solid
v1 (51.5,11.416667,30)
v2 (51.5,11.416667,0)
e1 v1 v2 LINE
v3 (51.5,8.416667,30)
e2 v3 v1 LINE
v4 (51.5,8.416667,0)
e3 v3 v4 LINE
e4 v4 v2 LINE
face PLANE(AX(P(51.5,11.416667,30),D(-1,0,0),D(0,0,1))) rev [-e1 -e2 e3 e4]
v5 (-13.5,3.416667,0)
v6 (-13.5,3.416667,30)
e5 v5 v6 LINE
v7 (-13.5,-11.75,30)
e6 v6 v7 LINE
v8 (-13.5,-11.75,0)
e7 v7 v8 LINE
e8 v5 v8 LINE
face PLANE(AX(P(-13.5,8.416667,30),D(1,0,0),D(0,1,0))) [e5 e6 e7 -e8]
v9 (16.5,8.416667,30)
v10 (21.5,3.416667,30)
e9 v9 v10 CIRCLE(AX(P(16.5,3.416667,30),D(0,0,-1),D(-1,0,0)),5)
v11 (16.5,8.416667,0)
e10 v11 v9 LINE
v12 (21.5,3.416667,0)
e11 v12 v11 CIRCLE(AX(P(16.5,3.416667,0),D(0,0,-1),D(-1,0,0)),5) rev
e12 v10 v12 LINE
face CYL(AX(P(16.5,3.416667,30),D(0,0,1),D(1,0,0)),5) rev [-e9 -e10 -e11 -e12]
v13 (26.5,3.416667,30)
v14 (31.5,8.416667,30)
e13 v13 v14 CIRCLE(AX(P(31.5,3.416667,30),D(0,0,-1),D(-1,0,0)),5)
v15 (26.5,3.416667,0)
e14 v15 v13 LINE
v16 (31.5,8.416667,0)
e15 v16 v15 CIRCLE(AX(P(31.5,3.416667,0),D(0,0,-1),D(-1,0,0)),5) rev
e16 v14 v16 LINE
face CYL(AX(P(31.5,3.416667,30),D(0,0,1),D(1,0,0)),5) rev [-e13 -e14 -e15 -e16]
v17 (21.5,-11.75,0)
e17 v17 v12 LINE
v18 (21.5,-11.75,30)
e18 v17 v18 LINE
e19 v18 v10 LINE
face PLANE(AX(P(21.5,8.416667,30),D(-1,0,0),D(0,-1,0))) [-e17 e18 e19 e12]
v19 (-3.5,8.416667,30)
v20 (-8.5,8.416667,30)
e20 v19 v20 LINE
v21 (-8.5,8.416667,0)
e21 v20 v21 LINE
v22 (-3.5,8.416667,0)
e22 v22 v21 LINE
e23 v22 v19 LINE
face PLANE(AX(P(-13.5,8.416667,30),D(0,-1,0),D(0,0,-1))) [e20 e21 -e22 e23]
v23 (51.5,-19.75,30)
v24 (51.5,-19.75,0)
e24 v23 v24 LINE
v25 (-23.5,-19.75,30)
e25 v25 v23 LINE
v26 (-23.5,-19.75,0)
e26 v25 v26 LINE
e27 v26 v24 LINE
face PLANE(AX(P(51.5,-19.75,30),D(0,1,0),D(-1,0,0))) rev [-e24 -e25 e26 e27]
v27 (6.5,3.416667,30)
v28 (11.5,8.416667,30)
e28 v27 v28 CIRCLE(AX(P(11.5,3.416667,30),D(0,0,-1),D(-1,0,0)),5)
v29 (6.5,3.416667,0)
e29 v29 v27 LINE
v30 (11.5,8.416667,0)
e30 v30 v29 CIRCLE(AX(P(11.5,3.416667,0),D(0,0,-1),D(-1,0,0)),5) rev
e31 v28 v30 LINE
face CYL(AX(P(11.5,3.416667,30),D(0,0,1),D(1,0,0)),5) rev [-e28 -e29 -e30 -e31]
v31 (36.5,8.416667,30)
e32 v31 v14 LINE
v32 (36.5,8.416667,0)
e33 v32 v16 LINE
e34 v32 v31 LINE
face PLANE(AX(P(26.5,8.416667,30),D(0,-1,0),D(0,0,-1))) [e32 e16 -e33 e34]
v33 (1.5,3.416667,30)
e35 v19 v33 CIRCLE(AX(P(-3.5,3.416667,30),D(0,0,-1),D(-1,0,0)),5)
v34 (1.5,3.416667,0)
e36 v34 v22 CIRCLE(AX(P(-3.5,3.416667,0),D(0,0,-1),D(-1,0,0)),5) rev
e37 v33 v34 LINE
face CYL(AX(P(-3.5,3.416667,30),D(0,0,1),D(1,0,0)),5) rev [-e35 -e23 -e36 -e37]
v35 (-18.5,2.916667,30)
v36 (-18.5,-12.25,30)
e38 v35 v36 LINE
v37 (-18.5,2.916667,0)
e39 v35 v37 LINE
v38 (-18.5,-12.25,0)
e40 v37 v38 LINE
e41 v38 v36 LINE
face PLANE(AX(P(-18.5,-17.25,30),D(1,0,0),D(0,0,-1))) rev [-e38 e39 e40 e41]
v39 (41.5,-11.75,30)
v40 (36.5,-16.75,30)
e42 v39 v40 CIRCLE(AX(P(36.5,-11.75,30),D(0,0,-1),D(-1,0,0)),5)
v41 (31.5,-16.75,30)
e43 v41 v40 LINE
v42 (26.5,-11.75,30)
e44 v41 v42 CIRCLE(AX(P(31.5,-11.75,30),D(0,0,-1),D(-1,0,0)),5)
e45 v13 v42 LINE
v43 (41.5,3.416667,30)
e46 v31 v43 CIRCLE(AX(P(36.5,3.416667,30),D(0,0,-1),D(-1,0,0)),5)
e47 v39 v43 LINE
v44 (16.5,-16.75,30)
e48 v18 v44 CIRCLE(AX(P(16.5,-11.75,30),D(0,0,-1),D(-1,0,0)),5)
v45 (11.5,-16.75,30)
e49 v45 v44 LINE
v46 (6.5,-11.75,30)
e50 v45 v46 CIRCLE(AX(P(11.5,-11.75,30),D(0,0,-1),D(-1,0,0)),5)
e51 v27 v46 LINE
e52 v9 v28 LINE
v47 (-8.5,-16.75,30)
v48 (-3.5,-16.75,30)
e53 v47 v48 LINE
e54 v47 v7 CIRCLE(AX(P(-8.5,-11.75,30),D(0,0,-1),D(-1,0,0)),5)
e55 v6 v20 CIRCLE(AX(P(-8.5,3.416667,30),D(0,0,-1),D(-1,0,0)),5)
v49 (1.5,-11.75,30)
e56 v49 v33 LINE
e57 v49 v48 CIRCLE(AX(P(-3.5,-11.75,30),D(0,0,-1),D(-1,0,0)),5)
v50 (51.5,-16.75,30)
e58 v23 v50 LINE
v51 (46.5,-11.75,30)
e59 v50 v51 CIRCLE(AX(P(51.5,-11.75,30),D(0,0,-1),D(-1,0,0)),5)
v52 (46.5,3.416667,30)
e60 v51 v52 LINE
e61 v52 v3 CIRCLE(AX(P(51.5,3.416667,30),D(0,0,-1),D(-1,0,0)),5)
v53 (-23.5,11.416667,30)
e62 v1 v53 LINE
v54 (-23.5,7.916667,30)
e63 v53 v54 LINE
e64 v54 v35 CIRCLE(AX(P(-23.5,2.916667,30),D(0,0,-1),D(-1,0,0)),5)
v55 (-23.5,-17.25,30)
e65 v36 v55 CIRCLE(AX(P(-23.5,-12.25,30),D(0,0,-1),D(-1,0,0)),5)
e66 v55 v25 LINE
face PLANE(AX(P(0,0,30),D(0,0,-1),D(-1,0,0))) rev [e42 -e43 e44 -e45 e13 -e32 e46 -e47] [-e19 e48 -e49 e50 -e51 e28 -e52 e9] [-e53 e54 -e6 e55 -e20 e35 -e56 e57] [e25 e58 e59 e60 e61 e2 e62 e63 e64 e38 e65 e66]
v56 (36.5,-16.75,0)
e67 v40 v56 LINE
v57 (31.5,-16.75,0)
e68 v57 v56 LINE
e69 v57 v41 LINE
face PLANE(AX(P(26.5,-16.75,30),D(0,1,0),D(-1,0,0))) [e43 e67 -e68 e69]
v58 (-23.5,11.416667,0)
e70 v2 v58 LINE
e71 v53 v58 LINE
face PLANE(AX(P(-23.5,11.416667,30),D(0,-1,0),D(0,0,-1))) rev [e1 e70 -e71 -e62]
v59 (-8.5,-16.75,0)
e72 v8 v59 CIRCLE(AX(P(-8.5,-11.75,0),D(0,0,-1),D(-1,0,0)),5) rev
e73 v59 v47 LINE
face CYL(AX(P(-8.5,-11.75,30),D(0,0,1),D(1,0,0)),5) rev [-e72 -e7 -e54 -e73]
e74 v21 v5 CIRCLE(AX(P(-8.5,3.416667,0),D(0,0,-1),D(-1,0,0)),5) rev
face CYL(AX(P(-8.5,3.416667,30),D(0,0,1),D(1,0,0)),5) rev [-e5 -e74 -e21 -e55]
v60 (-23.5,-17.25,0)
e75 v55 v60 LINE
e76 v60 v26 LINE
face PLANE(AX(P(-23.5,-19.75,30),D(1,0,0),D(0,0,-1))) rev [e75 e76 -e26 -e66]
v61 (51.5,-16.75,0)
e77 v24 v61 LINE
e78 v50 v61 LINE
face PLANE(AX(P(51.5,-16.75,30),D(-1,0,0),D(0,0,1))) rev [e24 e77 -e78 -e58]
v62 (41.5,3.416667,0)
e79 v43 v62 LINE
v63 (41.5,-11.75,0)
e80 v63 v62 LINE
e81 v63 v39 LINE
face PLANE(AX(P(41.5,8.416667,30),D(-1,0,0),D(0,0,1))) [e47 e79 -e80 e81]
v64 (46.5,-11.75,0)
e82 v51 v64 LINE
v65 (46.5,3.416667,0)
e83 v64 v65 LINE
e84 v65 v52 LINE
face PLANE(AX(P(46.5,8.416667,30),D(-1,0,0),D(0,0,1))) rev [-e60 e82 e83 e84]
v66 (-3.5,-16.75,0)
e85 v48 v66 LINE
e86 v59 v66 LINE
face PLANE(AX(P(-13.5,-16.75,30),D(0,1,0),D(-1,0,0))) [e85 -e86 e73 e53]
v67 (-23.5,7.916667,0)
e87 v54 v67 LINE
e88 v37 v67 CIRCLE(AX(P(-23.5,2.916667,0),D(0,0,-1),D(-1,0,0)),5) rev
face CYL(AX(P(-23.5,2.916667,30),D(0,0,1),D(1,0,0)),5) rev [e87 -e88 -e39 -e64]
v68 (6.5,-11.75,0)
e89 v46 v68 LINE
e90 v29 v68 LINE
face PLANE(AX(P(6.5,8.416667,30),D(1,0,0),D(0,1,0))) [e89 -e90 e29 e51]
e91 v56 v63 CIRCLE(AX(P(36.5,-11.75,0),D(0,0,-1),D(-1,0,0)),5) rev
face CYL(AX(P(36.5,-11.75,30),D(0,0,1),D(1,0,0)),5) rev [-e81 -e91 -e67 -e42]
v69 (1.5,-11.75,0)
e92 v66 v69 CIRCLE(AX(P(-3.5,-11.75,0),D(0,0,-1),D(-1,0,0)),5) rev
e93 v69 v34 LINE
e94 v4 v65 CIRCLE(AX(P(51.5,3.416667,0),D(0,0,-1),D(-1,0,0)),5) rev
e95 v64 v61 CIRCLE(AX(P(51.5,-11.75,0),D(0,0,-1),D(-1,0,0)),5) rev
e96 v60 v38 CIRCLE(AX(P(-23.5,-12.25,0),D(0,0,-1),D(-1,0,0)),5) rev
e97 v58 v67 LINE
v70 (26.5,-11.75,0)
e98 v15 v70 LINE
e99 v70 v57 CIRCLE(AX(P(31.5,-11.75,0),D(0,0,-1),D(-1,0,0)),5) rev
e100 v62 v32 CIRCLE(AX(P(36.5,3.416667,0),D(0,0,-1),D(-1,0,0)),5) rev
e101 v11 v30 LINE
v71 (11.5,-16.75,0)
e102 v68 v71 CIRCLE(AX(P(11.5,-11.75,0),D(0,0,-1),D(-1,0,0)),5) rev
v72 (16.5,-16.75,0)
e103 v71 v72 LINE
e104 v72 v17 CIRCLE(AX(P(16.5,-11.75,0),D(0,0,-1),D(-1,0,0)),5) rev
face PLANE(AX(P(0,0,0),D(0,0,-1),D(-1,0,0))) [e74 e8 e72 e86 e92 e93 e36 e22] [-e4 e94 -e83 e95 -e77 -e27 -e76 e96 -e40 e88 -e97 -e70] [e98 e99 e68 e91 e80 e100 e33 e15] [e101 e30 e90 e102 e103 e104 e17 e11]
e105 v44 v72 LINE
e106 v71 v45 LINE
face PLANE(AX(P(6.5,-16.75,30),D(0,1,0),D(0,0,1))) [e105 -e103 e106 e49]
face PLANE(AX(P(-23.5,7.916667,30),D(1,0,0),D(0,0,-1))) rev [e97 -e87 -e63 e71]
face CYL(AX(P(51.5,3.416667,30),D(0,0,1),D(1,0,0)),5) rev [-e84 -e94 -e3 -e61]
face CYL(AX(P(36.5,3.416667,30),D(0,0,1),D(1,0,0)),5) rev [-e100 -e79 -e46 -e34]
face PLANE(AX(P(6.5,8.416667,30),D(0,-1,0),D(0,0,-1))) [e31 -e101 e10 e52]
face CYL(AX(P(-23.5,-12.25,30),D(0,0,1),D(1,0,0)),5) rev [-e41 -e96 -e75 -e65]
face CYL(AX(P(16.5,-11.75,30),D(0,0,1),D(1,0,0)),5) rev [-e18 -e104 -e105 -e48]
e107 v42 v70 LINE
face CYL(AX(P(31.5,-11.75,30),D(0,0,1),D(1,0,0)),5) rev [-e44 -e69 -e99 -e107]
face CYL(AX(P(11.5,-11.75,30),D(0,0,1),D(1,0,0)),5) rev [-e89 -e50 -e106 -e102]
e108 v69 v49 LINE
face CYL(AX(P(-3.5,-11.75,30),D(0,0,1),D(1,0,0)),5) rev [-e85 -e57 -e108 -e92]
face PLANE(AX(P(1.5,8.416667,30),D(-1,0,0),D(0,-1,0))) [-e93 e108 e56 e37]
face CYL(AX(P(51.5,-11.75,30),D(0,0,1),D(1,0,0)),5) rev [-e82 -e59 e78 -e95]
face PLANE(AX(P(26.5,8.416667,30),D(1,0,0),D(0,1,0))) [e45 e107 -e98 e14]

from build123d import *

# Parameters (mm, degrees)
SKETCH_1_W      = 15
SKETCH_1_H      = 25.166666667
EXTRUDE_1_DEPTH = 30
FILLET_1_R      = 5
FILLET_2_R      = 5
FILLET_3_R      = 5


with BuildPart() as part:
    # 草圖1 → 填料-伸長1 (new body)
    with BuildSketch(Plane.XY):
        Polygon((-23.5, 11.416666667), (51.5, 11.416666667), (51.5, 8.416666667), (46.5, 8.416666667), (46.5, -16.75), (51.5, -16.75), (51.5, -19.75), (-23.5, -19.75), (-23.5, -17.25), (-18.5, -17.25), (-18.5, 7.916666667), (-23.5, 7.916666667), align=None)
        with Locations((-6, -4.166666666)):
            Rectangle(SKETCH_1_W, SKETCH_1_H, mode=Mode.SUBTRACT)
        with Locations((14, -4.166666666)):
            Rectangle(SKETCH_1_W, SKETCH_1_H, mode=Mode.SUBTRACT)
        with Locations((34, -4.166666666)):
            Rectangle(SKETCH_1_W, SKETCH_1_H, mode=Mode.SUBTRACT)
    extrude(amount=EXTRUDE_1_DEPTH)

    # 圓角1
    fillet_1_edges = [part.edges().sort_by_distance(p)[0] for p in [
        (-18.5, 7.916666667, 15),
    ]]
    fillet(fillet_1_edges, radius=FILLET_1_R - 0.0001)  # a hair under: the kernel refuses the full size

    # 圓角2
    fillet_2_edges = [part.edges().sort_by_distance(p)[0] for p in [
        (-18.5, -17.25, 15),
    ]]
    fillet(fillet_2_edges, radius=FILLET_2_R - 0.0001)  # a hair under: the kernel refuses the full size

    # 圓角3
    fillet_3_edges = [part.edges().sort_by_distance(p)[0] for p in [
        (46.5, 8.416666667, 15),
        (46.5, -16.75, 15),
        (-13.5, 8.416666667, 15),
        (-13.5, -16.75, 15),
        (1.5, -16.75, 15),
        (1.5, 8.416666667, 15),
        (6.5, 8.416666667, 15),
        (6.5, -16.75, 15),
        (21.5, -16.75, 15),
        (21.5, 8.416666667, 15),
        (26.5, 8.416666667, 15),
        (26.5, -16.75, 15),
        (41.5, -16.75, 15),
        (41.5, 8.416666667, 15),
    ]]
    fillet(fillet_3_edges, radius=FILLET_3_R - 0.0001)  # a hair under: the kernel refuses the full size


solid = part.part
